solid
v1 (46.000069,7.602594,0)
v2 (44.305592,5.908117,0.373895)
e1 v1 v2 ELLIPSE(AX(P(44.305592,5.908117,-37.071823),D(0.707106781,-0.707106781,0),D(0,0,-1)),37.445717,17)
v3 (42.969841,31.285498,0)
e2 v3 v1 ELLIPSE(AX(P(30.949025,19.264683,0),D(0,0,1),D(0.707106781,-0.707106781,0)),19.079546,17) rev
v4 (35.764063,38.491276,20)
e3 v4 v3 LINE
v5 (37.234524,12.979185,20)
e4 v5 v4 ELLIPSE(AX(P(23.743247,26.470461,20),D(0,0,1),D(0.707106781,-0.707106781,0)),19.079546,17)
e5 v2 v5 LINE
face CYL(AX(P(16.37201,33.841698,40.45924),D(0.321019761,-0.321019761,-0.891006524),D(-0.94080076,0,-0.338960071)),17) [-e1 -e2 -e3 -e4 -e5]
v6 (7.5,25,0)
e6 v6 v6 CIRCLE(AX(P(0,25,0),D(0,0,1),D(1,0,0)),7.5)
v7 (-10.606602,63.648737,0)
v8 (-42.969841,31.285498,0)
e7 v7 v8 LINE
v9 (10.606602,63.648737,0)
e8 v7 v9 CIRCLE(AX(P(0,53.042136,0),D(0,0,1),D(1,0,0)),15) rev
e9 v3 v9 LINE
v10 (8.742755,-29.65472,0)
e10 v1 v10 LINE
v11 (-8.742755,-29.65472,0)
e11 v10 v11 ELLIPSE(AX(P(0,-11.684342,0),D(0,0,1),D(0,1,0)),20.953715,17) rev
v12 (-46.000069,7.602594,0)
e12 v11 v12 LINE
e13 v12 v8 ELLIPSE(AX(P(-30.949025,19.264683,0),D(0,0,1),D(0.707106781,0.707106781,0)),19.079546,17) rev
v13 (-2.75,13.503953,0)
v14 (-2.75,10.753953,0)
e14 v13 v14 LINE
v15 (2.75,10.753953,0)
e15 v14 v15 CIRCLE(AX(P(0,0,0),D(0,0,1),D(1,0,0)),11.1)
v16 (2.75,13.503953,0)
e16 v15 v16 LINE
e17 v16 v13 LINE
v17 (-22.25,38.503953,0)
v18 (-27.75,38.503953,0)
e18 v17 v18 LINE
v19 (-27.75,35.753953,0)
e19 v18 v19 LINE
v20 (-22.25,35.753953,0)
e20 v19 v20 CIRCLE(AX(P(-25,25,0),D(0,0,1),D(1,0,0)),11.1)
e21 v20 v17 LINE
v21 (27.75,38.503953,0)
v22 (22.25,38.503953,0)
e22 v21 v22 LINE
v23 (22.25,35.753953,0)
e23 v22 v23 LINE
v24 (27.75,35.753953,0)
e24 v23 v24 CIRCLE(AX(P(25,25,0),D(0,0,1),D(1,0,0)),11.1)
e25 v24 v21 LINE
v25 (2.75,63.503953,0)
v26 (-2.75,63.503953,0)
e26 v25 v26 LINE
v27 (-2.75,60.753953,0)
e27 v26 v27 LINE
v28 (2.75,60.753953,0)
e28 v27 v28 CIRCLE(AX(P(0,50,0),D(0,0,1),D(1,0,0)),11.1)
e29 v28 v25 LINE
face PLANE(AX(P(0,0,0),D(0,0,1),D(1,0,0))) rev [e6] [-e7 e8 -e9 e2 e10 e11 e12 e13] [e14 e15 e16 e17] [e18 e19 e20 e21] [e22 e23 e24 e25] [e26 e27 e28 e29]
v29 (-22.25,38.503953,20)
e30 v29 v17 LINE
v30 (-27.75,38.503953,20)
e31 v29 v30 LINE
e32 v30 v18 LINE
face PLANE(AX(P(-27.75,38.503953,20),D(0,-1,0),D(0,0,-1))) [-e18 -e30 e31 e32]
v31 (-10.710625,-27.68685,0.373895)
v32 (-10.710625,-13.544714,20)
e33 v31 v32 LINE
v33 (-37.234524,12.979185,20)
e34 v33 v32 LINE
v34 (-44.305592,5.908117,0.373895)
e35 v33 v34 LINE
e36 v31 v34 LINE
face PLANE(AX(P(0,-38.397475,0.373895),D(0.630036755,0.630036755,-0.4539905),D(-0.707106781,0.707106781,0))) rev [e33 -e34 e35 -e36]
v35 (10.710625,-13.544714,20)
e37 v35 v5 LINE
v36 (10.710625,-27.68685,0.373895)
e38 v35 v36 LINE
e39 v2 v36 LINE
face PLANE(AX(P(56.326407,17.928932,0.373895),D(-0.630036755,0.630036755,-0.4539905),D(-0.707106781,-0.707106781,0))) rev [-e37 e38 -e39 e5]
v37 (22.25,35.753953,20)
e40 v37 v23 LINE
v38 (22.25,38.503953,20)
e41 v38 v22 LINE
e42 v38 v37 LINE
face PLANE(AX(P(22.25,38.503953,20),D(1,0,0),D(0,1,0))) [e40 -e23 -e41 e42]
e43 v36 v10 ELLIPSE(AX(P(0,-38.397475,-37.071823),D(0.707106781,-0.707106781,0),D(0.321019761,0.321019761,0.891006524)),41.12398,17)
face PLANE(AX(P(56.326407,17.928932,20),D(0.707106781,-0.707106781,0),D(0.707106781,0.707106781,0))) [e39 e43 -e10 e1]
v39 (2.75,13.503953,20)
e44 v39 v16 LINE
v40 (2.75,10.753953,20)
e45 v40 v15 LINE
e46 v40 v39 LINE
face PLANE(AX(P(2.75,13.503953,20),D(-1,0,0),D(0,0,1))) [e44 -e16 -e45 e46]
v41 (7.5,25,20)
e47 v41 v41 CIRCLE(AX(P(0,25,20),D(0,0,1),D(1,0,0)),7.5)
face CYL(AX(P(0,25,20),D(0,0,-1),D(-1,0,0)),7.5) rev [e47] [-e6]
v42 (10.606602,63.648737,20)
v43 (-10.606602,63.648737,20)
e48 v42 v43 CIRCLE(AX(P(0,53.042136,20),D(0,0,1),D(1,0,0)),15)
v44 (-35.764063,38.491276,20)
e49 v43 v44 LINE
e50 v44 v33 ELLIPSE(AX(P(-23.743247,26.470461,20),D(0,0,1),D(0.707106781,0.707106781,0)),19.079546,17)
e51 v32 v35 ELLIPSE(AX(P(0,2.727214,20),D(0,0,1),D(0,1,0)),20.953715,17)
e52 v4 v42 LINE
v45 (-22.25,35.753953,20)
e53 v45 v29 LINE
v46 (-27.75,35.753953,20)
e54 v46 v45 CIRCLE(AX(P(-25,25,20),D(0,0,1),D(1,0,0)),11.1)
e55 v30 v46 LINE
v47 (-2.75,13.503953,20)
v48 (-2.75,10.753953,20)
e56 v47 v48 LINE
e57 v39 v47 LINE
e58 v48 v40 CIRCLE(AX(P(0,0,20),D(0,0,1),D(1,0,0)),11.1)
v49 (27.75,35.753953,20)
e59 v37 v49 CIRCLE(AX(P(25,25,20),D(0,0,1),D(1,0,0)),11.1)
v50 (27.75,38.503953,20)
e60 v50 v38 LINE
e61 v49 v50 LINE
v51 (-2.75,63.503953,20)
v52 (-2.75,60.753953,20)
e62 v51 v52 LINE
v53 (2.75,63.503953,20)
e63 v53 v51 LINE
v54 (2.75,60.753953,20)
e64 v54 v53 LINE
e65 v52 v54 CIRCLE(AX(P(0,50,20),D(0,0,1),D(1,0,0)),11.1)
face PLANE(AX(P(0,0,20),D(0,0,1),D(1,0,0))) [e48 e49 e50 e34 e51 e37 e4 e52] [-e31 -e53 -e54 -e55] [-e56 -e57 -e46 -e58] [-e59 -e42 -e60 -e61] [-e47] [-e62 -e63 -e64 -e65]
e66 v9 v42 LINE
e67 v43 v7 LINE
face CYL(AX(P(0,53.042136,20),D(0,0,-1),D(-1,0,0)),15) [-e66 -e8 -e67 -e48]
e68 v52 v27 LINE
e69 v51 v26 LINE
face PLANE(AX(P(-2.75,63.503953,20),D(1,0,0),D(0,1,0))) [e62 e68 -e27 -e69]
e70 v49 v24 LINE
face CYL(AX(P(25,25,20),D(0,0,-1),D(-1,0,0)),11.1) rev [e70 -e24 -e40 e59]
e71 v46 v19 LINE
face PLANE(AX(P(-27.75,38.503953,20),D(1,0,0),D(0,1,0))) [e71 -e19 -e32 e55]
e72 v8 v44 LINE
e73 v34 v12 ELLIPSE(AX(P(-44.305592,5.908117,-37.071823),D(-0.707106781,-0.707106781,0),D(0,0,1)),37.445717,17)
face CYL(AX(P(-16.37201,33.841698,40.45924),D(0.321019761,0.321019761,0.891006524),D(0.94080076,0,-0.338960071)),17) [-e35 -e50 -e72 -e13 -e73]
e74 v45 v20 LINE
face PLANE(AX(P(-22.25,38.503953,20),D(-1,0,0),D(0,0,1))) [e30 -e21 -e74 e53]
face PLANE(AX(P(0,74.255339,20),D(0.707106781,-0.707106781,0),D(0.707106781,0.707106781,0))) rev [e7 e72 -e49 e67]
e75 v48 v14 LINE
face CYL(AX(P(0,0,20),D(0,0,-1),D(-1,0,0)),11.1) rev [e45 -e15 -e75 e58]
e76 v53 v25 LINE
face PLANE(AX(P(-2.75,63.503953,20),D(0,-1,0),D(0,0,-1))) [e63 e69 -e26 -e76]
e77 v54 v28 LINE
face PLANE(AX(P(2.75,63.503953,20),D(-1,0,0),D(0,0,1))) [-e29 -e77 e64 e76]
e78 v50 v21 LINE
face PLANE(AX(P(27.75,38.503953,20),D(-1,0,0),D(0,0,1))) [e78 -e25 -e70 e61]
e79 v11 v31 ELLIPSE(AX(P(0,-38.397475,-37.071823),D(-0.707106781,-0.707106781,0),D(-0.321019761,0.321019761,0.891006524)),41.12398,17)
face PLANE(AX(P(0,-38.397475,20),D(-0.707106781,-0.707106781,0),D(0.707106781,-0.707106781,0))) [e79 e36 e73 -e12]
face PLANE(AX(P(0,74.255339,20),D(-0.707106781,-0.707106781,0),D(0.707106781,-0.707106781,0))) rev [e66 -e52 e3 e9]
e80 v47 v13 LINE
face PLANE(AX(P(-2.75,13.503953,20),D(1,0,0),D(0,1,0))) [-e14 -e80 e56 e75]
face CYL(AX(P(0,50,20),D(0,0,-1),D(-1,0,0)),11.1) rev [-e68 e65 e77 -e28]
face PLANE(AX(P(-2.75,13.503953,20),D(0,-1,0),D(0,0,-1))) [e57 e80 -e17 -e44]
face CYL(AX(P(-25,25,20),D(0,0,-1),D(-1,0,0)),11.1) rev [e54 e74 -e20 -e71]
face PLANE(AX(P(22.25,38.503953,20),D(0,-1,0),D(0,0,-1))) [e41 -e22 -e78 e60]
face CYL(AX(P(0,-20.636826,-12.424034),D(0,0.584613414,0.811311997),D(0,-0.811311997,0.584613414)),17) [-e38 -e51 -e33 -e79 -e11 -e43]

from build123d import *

# Parameters (mm, degrees)
SKETCH1_R           = 7.5
BOSS_EXTRUDE1_DEPTH = 20
FILLET1_R           = 15
BOSS_EXTRUDE2_DEPTH = 20
CHAMFER1_SIZE       = 10
CHAMFER1_SIZE2      = 19.626105055
FILLET2_R           = 17


with BuildPart() as part:
    # Sketch1 → Boss-Extrude1 (new body)
    with BuildSketch(Plane.XY):
        Polygon((0, -24.255339059), (49.255339059, 25), (0, 74.255339059), (-49.255339059, 25), align=None)
        with Locations((0, 25)):
            Circle(SKETCH1_R, mode=Mode.SUBTRACT)
        with BuildLine():
            Line((-2.75, 13.503952762), (2.75, 13.503952762))
            Line((2.75, 13.503952762), (2.75, 10.753952762))
            ThreePointArc((2.75, 10.753952762), (0, -11.1), (-2.75, 10.753952762))
            Line((-2.75, 10.753952762), (-2.75, 13.503952762))
        make_face(mode=Mode.SUBTRACT)
        with BuildLine():
            Line((-2.75, 63.503952762), (2.75, 63.503952762))
            Line((2.75, 63.503952762), (2.75, 60.753952762))
            ThreePointArc((2.75, 60.753952762), (0, 38.9), (-2.75, 60.753952762))
            Line((-2.75, 60.753952762), (-2.75, 63.503952762))
        make_face(mode=Mode.SUBTRACT)
        with BuildLine():
            Line((22.25, 38.503952762), (27.75, 38.503952762))
            Line((27.75, 38.503952762), (27.75, 35.753952762))
            ThreePointArc((27.75, 35.753952762), (25, 13.9), (22.25, 35.753952762))
            Line((22.25, 35.753952762), (22.25, 38.503952762))
        make_face(mode=Mode.SUBTRACT)
        with BuildLine():
            Line((-27.75, 38.503952762), (-22.25, 38.503952762))
            Line((-22.25, 38.503952762), (-22.25, 35.753952762))
            ThreePointArc((-22.25, 35.753952762), (-25, 13.9), (-27.75, 35.753952762))
            Line((-27.75, 35.753952762), (-27.75, 38.503952762))
        make_face(mode=Mode.SUBTRACT)
    extrude(amount=BOSS_EXTRUDE1_DEPTH)

    # Fillet1
    fillet1_edges = [part.edges().sort_by_distance(p)[0] for p in [
        (49.255339059, 25, 10),
        (0, -24.255339059, 10),
        (-49.255339059, 25, 10),
        (0, 74.255339059, 10),
    ]]
    fillet(fillet1_edges, radius=FILLET1_R)

    # Sketch5 → Boss-Extrude2 (add)
    with BuildSketch(Plane(origin=(0, 0, 0), x_dir=(-1, 0, 0), z_dir=(0, 0, -1))):
        Polygon((38.648737342, 35.606601718), (56.326406871, 17.928932188), (0, -38.397474683), (-56.326406871, 17.928932188), (-38.648737342, 35.606601718), (-38.648737342, 14.393398282), (-10.606601718, -13.648737342), (10.606601718, -13.648737342), (38.648737342, 14.393398282), align=None)
    extrude(amount=-BOSS_EXTRUDE2_DEPTH)

    # Chamfer1
    chamfer1_edges = [part.edges().sort_by_distance(p)[0] for p in [
        (-28.163203436, -10.234271247, 20),
        (28.163203436, -10.234271247, 20),
    ]]
    chamfer1_side = [part.faces().sort_by_distance(p)[0] for p in [
        (0, 14.439859593, 20),
    ]]
    chamfer(chamfer1_edges, length=CHAMFER1_SIZE, length2=CHAMFER1_SIZE2, reference=chamfer1_side[0])

    # Fillet2
    # the kernel refuses this fillet: 17 mm, written as the material it takes off along each edge
    with BuildSketch(Plane(origin=(0, -4.097424311, 47.974654117), x_dir=(-0.776565314012209, 0.5111563778483158, -0.3683279387422424), z_dir=(-2.7797289092988672e-15, -0.5846134144132094, -0.8113119965143676))) as fillet2_piece_1:
        with BuildLine():
            CenterArc((FILLET2_R * 0.811311996514, FILLET2_R), FILLET2_R, 191.89433134, 78.10566866)
            Line((-FILLET2_R * 0.167217384978, FILLET2_R * 0.793892626146), (0, 0))
            Line((0, 0), (FILLET2_R * 0.811311996514, 0))
        make_face()
    extrude(amount=93.152096374, mode=Mode.SUBTRACT)
    with BuildSketch(Plane(origin=(35.611999219, 38.643339841, 57.867777278), x_dir=(-0.7071067811865526, -0.7071067811865426, -3.622643282177079e-15), z_dir=(0.3210197609601017, -0.3210197609601017, -0.8910065241883689)), Plane(origin=(-35.611999219, 38.643339841, 57.867777278), x_dir=(0.630036755335051, 0.6300367553350514, -0.45399049973954475), z_dir=(-0.3210197609601016, -0.3210197609601017, -0.8910065241883689))) as fillet2_piece_2:
        with BuildLine():
            CenterArc((FILLET2_R, FILLET2_R), FILLET2_R, 180, 90)
            Line((0, FILLET2_R), (0, 0))
            Line((0, 0), (FILLET2_R, 0))
        make_face()
    extrude(amount=107.026892646, mode=Mode.SUBTRACT)


solid = part.part
